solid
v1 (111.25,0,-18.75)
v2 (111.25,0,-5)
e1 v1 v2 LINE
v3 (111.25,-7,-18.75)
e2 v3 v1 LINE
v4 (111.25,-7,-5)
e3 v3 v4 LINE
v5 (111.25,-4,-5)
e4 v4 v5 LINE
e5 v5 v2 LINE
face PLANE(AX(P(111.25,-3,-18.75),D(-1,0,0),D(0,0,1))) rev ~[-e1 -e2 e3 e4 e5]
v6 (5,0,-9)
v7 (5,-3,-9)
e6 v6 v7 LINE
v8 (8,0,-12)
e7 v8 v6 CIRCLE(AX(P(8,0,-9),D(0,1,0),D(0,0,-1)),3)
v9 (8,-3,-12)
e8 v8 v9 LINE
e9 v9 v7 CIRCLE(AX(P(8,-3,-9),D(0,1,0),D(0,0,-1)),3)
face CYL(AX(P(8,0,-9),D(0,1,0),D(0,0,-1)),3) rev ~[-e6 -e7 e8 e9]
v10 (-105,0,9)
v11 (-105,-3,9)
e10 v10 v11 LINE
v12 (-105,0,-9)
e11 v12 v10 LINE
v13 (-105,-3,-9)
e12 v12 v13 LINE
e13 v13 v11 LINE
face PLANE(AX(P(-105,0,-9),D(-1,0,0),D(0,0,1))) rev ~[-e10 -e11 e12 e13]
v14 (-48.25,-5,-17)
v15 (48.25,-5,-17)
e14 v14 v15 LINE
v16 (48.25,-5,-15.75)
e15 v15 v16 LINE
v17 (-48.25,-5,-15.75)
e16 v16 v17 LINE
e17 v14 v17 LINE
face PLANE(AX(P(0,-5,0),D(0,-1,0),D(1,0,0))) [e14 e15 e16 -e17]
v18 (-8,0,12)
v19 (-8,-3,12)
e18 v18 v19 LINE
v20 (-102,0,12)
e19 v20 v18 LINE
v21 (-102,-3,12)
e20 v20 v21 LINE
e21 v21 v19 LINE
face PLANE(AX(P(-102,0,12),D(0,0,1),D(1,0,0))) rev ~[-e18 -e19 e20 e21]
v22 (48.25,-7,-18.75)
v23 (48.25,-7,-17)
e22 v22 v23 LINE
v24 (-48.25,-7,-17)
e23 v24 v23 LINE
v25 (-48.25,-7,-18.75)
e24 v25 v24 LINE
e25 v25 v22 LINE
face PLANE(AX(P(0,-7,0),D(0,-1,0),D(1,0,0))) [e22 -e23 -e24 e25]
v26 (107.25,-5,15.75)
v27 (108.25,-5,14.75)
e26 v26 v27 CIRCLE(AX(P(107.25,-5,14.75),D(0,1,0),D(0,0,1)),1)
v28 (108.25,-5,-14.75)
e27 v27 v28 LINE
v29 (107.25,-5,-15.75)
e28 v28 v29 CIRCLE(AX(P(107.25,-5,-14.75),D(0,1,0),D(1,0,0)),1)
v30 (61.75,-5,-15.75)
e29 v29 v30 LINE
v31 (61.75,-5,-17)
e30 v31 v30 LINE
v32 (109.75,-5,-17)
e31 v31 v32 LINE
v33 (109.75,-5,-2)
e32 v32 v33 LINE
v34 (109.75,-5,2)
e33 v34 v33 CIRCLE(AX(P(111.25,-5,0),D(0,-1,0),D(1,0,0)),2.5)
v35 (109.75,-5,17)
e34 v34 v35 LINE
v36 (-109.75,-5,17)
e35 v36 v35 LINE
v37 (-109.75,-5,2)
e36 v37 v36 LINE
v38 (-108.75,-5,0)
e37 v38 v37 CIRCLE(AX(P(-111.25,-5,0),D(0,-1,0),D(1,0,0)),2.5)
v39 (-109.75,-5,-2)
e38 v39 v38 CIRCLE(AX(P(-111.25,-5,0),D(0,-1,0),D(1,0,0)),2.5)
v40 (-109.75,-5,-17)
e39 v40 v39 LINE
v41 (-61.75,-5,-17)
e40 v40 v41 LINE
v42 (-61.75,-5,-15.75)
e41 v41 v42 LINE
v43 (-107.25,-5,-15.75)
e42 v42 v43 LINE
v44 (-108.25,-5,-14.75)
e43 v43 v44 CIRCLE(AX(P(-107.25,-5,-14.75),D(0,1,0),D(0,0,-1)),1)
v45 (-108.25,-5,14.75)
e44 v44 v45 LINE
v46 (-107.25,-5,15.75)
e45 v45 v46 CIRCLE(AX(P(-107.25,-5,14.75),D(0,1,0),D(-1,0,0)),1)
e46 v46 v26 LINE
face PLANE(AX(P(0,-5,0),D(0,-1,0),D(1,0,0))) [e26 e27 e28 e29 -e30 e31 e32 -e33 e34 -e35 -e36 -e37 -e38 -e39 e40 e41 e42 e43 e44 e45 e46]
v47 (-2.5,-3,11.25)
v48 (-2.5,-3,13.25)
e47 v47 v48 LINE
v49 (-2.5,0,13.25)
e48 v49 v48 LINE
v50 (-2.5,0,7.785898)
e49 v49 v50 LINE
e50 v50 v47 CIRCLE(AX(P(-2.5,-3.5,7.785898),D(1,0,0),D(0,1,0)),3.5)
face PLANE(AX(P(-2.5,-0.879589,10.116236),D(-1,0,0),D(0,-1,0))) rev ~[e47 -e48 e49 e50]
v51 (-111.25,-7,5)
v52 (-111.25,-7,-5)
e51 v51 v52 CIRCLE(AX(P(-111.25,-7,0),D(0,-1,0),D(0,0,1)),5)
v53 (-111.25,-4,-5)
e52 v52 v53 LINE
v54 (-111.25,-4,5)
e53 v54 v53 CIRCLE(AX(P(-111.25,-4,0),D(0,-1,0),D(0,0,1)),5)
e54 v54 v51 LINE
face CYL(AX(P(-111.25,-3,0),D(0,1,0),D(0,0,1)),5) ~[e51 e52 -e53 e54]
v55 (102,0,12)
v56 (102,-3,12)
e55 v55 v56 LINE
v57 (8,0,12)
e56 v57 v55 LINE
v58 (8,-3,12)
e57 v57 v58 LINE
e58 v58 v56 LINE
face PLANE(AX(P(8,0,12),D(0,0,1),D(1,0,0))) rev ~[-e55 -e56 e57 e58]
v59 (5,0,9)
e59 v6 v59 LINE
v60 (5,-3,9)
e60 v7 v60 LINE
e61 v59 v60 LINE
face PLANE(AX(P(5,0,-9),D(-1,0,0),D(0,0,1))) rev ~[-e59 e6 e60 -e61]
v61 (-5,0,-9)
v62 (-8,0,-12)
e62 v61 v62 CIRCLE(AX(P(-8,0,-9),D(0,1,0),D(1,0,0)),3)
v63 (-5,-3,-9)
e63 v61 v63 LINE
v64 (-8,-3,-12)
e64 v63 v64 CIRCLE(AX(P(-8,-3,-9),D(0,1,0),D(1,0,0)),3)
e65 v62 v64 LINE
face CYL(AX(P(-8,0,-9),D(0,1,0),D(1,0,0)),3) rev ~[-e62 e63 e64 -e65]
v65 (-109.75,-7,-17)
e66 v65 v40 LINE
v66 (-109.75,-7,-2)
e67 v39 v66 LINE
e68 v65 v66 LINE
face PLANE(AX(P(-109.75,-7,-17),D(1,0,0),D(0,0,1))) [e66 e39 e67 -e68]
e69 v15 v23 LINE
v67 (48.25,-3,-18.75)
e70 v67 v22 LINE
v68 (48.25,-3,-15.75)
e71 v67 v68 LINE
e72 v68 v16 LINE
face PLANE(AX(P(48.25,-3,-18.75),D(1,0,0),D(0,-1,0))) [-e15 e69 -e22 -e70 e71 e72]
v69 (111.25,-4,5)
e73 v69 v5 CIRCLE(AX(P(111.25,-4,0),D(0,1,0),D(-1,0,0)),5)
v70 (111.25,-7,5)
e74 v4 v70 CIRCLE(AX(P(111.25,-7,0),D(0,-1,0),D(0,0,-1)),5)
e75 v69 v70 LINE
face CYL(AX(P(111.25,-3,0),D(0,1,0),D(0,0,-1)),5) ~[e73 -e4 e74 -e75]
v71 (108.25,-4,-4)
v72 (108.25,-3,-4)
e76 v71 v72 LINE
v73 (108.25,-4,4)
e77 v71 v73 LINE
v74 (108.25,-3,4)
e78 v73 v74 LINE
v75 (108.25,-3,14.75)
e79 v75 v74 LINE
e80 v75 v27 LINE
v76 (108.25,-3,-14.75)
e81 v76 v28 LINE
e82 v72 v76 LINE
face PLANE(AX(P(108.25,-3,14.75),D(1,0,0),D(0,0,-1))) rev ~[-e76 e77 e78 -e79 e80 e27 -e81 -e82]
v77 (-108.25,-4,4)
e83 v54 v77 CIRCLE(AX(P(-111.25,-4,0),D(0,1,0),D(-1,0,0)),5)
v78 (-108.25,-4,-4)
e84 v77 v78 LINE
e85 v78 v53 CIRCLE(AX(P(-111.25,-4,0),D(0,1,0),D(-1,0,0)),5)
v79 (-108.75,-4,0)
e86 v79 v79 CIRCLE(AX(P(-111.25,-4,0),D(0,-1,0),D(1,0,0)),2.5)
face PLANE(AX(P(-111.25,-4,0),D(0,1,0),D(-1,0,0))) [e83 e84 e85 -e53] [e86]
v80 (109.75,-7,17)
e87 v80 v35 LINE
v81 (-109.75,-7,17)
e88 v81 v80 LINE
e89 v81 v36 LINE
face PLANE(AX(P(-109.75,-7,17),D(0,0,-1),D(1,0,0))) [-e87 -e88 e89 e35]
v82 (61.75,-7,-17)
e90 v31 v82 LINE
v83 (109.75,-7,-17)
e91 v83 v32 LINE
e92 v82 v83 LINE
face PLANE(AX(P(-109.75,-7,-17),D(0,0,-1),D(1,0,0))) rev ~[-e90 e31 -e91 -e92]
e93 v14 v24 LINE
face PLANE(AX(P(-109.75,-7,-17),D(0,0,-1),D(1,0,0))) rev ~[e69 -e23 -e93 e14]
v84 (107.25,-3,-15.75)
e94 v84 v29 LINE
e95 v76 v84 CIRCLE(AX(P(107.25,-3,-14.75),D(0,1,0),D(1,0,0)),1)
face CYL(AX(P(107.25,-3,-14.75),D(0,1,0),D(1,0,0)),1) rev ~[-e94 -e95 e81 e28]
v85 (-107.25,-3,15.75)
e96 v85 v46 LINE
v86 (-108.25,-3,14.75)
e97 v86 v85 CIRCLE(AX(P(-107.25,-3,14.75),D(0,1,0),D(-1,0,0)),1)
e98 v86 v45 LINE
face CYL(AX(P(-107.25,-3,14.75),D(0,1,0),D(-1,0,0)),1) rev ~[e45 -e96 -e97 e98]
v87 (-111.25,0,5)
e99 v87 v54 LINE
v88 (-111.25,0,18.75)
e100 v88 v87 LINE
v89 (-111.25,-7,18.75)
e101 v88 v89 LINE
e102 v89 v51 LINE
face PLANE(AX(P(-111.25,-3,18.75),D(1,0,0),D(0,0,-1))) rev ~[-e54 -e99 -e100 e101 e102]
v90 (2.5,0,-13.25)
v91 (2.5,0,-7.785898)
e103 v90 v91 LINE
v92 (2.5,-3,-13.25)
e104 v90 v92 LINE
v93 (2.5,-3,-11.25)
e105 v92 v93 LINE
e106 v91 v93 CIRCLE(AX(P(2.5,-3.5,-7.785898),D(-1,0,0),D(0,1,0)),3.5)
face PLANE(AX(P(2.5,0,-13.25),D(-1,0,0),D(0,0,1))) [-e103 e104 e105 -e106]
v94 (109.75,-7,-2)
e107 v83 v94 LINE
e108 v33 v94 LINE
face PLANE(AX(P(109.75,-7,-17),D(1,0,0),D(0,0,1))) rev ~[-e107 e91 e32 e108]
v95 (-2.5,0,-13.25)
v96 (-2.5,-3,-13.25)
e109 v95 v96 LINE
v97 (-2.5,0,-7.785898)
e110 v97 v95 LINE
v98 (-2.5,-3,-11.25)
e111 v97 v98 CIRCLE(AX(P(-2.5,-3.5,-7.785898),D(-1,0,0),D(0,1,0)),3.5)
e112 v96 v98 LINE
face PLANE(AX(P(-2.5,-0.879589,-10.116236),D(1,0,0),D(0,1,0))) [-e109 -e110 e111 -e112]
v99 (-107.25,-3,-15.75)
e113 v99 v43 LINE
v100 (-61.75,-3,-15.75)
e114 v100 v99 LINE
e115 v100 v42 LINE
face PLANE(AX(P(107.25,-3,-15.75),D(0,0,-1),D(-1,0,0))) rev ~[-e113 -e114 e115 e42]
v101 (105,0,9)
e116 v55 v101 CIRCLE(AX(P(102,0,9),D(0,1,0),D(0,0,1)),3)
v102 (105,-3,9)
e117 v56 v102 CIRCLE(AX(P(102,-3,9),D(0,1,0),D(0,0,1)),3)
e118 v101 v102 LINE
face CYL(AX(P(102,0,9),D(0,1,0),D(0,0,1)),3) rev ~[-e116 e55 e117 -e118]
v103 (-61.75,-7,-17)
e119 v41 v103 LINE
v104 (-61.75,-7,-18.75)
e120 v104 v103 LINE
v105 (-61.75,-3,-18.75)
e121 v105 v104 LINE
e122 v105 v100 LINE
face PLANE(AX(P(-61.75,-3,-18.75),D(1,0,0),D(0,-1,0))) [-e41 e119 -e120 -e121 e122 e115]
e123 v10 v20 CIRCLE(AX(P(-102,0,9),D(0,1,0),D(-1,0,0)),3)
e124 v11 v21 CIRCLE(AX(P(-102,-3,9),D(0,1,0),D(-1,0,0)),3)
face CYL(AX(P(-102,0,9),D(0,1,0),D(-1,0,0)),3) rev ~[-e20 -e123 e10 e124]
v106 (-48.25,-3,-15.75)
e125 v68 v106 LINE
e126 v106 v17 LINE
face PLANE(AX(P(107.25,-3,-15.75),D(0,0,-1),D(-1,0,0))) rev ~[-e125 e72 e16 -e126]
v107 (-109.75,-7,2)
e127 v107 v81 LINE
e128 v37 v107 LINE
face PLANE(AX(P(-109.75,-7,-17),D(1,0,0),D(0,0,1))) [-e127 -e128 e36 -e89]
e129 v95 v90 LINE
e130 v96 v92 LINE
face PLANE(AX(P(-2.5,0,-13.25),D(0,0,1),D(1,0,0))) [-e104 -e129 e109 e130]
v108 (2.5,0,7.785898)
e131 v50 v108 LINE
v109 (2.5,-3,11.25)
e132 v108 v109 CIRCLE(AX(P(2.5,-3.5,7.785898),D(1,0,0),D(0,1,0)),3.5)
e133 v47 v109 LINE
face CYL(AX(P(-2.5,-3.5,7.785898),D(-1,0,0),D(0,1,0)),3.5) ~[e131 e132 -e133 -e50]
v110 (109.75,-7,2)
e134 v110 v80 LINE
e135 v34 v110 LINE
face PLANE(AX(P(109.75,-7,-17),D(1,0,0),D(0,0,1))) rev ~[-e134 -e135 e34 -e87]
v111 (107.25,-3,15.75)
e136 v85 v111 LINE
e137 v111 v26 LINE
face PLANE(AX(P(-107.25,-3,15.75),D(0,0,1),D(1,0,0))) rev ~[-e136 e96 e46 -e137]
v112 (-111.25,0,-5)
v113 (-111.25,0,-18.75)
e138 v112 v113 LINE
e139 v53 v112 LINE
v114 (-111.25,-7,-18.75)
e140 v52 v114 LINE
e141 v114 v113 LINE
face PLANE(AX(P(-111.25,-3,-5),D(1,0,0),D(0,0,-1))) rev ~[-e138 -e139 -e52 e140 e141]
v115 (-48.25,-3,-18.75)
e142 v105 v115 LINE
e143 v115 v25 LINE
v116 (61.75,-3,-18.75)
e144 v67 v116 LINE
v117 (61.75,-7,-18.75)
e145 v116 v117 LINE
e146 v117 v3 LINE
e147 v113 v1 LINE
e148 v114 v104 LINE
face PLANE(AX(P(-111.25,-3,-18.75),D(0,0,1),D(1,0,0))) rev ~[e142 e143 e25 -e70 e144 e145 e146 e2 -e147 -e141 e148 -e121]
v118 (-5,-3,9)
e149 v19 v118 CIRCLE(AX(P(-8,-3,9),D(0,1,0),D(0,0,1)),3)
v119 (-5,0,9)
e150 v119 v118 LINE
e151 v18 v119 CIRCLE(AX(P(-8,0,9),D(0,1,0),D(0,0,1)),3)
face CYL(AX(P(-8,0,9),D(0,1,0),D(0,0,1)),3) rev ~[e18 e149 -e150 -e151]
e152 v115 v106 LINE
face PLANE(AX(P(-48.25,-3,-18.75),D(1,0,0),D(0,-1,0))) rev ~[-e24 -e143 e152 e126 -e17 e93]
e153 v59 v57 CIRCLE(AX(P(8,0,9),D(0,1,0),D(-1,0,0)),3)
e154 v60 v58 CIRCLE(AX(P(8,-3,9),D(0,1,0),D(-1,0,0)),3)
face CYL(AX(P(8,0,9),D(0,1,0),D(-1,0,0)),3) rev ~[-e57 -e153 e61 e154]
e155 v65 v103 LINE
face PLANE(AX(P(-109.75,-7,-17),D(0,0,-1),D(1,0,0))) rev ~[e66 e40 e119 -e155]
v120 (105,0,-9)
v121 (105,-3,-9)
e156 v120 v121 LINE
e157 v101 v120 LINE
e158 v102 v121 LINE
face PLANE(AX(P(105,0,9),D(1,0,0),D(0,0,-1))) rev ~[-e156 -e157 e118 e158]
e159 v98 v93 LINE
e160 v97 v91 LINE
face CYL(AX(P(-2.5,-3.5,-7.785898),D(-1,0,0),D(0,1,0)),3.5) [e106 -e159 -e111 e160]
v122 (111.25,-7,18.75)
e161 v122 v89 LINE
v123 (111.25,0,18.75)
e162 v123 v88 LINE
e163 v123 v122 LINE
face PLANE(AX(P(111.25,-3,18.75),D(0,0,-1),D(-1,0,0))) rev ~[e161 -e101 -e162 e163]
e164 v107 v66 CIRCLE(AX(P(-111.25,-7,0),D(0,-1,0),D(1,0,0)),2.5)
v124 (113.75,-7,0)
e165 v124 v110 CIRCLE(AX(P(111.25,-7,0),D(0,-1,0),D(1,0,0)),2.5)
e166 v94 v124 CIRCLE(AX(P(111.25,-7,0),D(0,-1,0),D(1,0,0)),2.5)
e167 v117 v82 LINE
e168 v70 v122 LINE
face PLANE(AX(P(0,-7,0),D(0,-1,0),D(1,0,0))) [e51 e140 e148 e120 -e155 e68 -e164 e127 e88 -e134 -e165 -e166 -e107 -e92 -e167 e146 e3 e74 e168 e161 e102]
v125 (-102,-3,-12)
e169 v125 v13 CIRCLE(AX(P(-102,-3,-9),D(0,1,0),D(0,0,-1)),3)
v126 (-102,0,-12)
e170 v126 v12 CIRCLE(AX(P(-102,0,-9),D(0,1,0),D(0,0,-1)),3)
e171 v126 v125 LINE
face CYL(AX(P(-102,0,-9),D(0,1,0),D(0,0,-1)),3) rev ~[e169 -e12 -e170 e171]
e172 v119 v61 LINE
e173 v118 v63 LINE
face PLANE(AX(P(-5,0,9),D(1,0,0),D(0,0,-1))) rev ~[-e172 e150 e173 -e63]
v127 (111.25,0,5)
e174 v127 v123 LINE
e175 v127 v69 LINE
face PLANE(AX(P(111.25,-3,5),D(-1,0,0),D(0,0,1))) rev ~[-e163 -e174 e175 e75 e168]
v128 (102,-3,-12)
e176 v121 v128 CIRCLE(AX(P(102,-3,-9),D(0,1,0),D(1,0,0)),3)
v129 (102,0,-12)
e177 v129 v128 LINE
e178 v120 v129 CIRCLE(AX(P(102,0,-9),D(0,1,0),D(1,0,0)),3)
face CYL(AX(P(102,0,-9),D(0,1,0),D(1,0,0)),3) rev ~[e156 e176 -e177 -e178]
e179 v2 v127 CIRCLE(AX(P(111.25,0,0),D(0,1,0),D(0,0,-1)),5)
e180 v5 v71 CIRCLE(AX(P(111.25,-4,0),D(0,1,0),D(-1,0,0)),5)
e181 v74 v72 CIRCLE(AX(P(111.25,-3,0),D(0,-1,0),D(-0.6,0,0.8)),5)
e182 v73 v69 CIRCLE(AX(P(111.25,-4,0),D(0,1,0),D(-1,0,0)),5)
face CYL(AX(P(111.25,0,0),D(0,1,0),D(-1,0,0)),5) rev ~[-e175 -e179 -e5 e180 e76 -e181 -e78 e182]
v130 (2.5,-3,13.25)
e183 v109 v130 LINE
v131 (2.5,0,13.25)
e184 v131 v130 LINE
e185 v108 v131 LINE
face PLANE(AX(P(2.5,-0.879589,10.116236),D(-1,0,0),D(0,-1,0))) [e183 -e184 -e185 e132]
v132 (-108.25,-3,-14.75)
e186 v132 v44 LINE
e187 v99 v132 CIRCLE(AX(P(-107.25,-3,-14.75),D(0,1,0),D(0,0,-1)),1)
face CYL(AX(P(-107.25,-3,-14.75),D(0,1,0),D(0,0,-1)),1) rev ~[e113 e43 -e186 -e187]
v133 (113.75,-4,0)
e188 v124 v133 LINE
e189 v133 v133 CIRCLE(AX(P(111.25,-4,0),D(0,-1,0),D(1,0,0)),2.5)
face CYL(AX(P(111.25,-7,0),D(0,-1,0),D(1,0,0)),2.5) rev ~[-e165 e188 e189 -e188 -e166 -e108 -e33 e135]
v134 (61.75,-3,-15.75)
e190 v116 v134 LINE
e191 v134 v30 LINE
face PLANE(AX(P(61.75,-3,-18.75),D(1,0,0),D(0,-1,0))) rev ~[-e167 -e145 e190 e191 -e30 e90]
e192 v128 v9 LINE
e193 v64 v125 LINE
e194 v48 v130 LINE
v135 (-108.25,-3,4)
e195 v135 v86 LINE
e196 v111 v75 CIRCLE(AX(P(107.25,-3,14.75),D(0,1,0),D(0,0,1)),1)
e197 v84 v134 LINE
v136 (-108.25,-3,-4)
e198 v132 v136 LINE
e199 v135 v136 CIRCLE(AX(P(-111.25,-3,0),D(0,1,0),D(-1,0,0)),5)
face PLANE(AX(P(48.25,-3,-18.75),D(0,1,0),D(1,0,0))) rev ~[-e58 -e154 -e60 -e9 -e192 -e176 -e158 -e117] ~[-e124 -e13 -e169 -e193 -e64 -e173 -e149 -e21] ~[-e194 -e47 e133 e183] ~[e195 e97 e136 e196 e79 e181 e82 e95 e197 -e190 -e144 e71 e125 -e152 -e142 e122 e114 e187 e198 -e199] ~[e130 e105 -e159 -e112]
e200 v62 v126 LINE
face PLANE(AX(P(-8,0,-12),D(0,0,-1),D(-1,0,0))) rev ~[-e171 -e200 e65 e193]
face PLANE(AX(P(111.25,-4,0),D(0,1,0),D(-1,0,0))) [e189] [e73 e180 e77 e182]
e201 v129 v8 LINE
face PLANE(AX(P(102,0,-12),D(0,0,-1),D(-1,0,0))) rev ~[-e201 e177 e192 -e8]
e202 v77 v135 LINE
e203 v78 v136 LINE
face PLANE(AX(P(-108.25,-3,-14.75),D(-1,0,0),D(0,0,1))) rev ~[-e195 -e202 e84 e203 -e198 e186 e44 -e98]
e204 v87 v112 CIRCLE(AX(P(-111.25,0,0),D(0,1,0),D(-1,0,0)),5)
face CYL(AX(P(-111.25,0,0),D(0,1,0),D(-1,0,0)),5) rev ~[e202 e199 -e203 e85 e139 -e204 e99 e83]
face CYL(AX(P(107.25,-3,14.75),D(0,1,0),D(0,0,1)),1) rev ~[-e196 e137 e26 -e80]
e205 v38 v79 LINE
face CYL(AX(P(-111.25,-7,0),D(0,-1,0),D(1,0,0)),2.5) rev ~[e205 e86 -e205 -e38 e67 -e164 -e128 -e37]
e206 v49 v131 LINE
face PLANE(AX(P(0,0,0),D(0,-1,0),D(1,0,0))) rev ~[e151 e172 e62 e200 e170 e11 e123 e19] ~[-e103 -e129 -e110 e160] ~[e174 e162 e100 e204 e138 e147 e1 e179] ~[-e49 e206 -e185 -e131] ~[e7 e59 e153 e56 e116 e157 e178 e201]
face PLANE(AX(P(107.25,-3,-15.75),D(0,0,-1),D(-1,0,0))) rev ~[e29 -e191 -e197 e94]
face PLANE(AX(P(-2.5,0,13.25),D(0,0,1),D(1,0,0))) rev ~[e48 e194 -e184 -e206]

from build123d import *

# Parameters (mm, degrees)
F0_W         = 5
F0_H         = 2
F1_DEPTH     = 3
F2_R         = 2
F3_DEPTH     = 4
F4_W         = 219.5
F4_H         = 34
F4_W_2       = 214.53166008
F4_H_2       = 28.9933998138
F5_DEPTH     = 2
F6_R         = 2.5
F7_DEPTH     = 7.001
F8_R         = 5
F9_DEPTH     = 4
F10_W        = 13.5
F10_H        = 4
F11_DEPTH    = 25
F12_T1_DEPTH = 5


# Not quite as in the source:
# - a fillet or chamfer that OpenCascade refuses, or shapes differently, is made with other operations: its cross-section is extruded or revolved along the edge and cut away or added
# - a feature names something its author has since deleted; it is built from what else it names


with BuildPart() as f1:
    # F0 (on Front) → F1 (new body)
    with BuildSketch(Plane.XZ):
        Polygon((111.25, 5), (111.25, 18.75), (-111.25, 18.75), (-111.25, 5), (-111.25, -5), (-111.25, -18.75), (111.25, -18.75), (111.25, -5), align=None)
        with Locations((0, -12.25)):
            Rectangle(F0_W, F0_H, mode=Mode.SUBTRACT)
        with BuildLine():
            Line((-102, 12), (-8, 12))
            ThreePointArc((-8, 12), (-5.8786796564, 11.1213203436), (-5, 9))
            Line((-5, 9), (-5, -9))
            ThreePointArc((-5, -9), (-5.8786796564, -11.1213203436), (-8, -12))
            Line((-8, -12), (-102, -12))
            ThreePointArc((-102, -12), (-104.1213203436, -11.1213203436), (-105, -9))
            Line((-105, -9), (-105, 9))
            ThreePointArc((-105, 9), (-104.1213203436, 11.1213203436), (-102, 12))
        make_face(mode=Mode.SUBTRACT)
        with BuildLine():
            Line((8, 12), (102, 12))
            ThreePointArc((102, 12), (104.1213203436, 11.1213203436), (105, 9))
            Line((105, 9), (105, -9))
            ThreePointArc((105, -9), (104.1213203436, -11.1213203436), (102, -12))
            Line((102, -12), (8, -12))
            ThreePointArc((8, -12), (5.8786796564, -11.1213203436), (5, -9))
            Line((5, -9), (5, 9))
            ThreePointArc((5, 9), (5.8786796564, 11.1213203436), (8, 12))
        make_face(mode=Mode.SUBTRACT)
        with Locations((0, 12.25)):
            Rectangle(F0_W, F0_H, mode=Mode.SUBTRACT)
        with BuildLine():
            ThreePointArc((111.25, -5), (116.25, 0), (111.25, 5))
            Line((111.25, 5), (111.25, -5))
        make_face()
        with BuildLine():
            Line((-111.25, -5), (-111.25, 5))
            ThreePointArc((-111.25, 5), (-116.25, 0), (-111.25, -5))
        make_face()
    extrude(amount=F1_DEPTH)

    # F2 (on face) → F3 (join)
    with BuildSketch(Plane.XZ.offset(3)):
        with BuildLine():
            ThreePointArc((111.25, -5), (116.25, 0), (111.25, 5))
            Line((111.25, 5), (111.25, 18.75))
            Line((111.25, 18.75), (-111.25, 18.75))
            Line((-111.25, 18.75), (-111.25, 5))
            ThreePointArc((-111.25, 5), (-116.25, 0), (-111.25, -5))
            Line((-111.25, -5), (-111.25, -18.75))
            Line((-111.25, -18.75), (111.25, -18.75))
            Line((111.25, -18.75), (111.25, -5))
        make_face()
        with Locations((-111.25, 0)):
            Circle(F2_R, mode=Mode.SUBTRACT)
        with BuildLine():
            Line((-107.25, 15.75), (107.25, 15.75))
            ThreePointArc((107.25, 15.75), (107.9571067812, 15.4571067812), (108.25, 14.75))
            Line((108.25, 14.75), (108.25, -14.75))
            ThreePointArc((108.25, -14.75), (107.9571067812, -15.4571067812), (107.25, -15.75))
            Line((107.25, -15.75), (-107.25, -15.75))
            ThreePointArc((-107.25, -15.75), (-107.9571067812, -15.4571067812), (-108.25, -14.75))
            Line((-108.25, -14.75), (-108.25, 14.75))
            ThreePointArc((-108.25, 14.75), (-107.9571067812, 15.4571067812), (-107.25, 15.75))
        make_face(mode=Mode.SUBTRACT)
        with Locations((111.25, 0)):
            Circle(F2_R, mode=Mode.SUBTRACT)
    extrude(amount=F3_DEPTH)

    # F4 (on face) → F5 (cut)
    with BuildSketch(Plane.XZ.offset(7)):
        Rectangle(F4_W, F4_H)
        Rectangle(F4_W_2, F4_H_2, mode=Mode.SUBTRACT)
    extrude(amount=-F5_DEPTH, mode=Mode.SUBTRACT)

    # F6 (on face) → F7 (cut, through all)
    with BuildSketch(Plane.XZ.offset(7)):
        with Locations((-111.25, 0)):
            Circle(F6_R)
        with Locations((111.25, 0)):
            Circle(F6_R)
    extrude(amount=-F7_DEPTH, mode=Mode.SUBTRACT)

    # F8 (on face) → F9 (cut)
    with BuildSketch(Plane(origin=(0, 0, 0), x_dir=(-1, 0, 0), z_dir=(0, 1, 0))):
        with Locations((-111.25, 0)):
            Circle(F8_R)
        with Locations((111.25, 0)):
            Circle(F8_R)
    extrude(amount=-F9_DEPTH, mode=Mode.SUBTRACT)

    # F10 (on face) → F11 (cut)
    with BuildSketch(Plane(origin=(0, 0, -18.75), x_dir=(1, 0, 0), z_dir=(0, 0, -1))):
        with Locations((-55, 5)):
            Rectangle(F10_W, F10_H)
        with Locations((55, 5)):
            Rectangle(F10_W, F10_H)
    extrude(amount=-F11_DEPTH, mode=Mode.SUBTRACT)

    # F12: fillet of radius 3.5 on 2 edges, made by hand

    # F12_s2 → F12_t1 (cut)
    with BuildSketch(Plane.YZ.offset(-2.5)):
        with BuildLine():
            ThreePointArc((0, 7.7858983849), (-0.8542486889, 10.0771862323), (-3, 11.25))
            Line((-3, 11.25), (0, 11.25))
            Line((0, 11.25), (0, 7.7858983849))
        make_face()
        with BuildLine():
            ThreePointArc((0, -7.7858983849), (-0.8542486889, -10.0771862323), (-3, -11.25))
            Line((-3, -11.25), (0, -11.25))
            Line((0, -11.25), (0, -7.7858983849))
        make_face()
    extrude(amount=F12_T1_DEPTH, mode=Mode.SUBTRACT)


solid = f1.part
